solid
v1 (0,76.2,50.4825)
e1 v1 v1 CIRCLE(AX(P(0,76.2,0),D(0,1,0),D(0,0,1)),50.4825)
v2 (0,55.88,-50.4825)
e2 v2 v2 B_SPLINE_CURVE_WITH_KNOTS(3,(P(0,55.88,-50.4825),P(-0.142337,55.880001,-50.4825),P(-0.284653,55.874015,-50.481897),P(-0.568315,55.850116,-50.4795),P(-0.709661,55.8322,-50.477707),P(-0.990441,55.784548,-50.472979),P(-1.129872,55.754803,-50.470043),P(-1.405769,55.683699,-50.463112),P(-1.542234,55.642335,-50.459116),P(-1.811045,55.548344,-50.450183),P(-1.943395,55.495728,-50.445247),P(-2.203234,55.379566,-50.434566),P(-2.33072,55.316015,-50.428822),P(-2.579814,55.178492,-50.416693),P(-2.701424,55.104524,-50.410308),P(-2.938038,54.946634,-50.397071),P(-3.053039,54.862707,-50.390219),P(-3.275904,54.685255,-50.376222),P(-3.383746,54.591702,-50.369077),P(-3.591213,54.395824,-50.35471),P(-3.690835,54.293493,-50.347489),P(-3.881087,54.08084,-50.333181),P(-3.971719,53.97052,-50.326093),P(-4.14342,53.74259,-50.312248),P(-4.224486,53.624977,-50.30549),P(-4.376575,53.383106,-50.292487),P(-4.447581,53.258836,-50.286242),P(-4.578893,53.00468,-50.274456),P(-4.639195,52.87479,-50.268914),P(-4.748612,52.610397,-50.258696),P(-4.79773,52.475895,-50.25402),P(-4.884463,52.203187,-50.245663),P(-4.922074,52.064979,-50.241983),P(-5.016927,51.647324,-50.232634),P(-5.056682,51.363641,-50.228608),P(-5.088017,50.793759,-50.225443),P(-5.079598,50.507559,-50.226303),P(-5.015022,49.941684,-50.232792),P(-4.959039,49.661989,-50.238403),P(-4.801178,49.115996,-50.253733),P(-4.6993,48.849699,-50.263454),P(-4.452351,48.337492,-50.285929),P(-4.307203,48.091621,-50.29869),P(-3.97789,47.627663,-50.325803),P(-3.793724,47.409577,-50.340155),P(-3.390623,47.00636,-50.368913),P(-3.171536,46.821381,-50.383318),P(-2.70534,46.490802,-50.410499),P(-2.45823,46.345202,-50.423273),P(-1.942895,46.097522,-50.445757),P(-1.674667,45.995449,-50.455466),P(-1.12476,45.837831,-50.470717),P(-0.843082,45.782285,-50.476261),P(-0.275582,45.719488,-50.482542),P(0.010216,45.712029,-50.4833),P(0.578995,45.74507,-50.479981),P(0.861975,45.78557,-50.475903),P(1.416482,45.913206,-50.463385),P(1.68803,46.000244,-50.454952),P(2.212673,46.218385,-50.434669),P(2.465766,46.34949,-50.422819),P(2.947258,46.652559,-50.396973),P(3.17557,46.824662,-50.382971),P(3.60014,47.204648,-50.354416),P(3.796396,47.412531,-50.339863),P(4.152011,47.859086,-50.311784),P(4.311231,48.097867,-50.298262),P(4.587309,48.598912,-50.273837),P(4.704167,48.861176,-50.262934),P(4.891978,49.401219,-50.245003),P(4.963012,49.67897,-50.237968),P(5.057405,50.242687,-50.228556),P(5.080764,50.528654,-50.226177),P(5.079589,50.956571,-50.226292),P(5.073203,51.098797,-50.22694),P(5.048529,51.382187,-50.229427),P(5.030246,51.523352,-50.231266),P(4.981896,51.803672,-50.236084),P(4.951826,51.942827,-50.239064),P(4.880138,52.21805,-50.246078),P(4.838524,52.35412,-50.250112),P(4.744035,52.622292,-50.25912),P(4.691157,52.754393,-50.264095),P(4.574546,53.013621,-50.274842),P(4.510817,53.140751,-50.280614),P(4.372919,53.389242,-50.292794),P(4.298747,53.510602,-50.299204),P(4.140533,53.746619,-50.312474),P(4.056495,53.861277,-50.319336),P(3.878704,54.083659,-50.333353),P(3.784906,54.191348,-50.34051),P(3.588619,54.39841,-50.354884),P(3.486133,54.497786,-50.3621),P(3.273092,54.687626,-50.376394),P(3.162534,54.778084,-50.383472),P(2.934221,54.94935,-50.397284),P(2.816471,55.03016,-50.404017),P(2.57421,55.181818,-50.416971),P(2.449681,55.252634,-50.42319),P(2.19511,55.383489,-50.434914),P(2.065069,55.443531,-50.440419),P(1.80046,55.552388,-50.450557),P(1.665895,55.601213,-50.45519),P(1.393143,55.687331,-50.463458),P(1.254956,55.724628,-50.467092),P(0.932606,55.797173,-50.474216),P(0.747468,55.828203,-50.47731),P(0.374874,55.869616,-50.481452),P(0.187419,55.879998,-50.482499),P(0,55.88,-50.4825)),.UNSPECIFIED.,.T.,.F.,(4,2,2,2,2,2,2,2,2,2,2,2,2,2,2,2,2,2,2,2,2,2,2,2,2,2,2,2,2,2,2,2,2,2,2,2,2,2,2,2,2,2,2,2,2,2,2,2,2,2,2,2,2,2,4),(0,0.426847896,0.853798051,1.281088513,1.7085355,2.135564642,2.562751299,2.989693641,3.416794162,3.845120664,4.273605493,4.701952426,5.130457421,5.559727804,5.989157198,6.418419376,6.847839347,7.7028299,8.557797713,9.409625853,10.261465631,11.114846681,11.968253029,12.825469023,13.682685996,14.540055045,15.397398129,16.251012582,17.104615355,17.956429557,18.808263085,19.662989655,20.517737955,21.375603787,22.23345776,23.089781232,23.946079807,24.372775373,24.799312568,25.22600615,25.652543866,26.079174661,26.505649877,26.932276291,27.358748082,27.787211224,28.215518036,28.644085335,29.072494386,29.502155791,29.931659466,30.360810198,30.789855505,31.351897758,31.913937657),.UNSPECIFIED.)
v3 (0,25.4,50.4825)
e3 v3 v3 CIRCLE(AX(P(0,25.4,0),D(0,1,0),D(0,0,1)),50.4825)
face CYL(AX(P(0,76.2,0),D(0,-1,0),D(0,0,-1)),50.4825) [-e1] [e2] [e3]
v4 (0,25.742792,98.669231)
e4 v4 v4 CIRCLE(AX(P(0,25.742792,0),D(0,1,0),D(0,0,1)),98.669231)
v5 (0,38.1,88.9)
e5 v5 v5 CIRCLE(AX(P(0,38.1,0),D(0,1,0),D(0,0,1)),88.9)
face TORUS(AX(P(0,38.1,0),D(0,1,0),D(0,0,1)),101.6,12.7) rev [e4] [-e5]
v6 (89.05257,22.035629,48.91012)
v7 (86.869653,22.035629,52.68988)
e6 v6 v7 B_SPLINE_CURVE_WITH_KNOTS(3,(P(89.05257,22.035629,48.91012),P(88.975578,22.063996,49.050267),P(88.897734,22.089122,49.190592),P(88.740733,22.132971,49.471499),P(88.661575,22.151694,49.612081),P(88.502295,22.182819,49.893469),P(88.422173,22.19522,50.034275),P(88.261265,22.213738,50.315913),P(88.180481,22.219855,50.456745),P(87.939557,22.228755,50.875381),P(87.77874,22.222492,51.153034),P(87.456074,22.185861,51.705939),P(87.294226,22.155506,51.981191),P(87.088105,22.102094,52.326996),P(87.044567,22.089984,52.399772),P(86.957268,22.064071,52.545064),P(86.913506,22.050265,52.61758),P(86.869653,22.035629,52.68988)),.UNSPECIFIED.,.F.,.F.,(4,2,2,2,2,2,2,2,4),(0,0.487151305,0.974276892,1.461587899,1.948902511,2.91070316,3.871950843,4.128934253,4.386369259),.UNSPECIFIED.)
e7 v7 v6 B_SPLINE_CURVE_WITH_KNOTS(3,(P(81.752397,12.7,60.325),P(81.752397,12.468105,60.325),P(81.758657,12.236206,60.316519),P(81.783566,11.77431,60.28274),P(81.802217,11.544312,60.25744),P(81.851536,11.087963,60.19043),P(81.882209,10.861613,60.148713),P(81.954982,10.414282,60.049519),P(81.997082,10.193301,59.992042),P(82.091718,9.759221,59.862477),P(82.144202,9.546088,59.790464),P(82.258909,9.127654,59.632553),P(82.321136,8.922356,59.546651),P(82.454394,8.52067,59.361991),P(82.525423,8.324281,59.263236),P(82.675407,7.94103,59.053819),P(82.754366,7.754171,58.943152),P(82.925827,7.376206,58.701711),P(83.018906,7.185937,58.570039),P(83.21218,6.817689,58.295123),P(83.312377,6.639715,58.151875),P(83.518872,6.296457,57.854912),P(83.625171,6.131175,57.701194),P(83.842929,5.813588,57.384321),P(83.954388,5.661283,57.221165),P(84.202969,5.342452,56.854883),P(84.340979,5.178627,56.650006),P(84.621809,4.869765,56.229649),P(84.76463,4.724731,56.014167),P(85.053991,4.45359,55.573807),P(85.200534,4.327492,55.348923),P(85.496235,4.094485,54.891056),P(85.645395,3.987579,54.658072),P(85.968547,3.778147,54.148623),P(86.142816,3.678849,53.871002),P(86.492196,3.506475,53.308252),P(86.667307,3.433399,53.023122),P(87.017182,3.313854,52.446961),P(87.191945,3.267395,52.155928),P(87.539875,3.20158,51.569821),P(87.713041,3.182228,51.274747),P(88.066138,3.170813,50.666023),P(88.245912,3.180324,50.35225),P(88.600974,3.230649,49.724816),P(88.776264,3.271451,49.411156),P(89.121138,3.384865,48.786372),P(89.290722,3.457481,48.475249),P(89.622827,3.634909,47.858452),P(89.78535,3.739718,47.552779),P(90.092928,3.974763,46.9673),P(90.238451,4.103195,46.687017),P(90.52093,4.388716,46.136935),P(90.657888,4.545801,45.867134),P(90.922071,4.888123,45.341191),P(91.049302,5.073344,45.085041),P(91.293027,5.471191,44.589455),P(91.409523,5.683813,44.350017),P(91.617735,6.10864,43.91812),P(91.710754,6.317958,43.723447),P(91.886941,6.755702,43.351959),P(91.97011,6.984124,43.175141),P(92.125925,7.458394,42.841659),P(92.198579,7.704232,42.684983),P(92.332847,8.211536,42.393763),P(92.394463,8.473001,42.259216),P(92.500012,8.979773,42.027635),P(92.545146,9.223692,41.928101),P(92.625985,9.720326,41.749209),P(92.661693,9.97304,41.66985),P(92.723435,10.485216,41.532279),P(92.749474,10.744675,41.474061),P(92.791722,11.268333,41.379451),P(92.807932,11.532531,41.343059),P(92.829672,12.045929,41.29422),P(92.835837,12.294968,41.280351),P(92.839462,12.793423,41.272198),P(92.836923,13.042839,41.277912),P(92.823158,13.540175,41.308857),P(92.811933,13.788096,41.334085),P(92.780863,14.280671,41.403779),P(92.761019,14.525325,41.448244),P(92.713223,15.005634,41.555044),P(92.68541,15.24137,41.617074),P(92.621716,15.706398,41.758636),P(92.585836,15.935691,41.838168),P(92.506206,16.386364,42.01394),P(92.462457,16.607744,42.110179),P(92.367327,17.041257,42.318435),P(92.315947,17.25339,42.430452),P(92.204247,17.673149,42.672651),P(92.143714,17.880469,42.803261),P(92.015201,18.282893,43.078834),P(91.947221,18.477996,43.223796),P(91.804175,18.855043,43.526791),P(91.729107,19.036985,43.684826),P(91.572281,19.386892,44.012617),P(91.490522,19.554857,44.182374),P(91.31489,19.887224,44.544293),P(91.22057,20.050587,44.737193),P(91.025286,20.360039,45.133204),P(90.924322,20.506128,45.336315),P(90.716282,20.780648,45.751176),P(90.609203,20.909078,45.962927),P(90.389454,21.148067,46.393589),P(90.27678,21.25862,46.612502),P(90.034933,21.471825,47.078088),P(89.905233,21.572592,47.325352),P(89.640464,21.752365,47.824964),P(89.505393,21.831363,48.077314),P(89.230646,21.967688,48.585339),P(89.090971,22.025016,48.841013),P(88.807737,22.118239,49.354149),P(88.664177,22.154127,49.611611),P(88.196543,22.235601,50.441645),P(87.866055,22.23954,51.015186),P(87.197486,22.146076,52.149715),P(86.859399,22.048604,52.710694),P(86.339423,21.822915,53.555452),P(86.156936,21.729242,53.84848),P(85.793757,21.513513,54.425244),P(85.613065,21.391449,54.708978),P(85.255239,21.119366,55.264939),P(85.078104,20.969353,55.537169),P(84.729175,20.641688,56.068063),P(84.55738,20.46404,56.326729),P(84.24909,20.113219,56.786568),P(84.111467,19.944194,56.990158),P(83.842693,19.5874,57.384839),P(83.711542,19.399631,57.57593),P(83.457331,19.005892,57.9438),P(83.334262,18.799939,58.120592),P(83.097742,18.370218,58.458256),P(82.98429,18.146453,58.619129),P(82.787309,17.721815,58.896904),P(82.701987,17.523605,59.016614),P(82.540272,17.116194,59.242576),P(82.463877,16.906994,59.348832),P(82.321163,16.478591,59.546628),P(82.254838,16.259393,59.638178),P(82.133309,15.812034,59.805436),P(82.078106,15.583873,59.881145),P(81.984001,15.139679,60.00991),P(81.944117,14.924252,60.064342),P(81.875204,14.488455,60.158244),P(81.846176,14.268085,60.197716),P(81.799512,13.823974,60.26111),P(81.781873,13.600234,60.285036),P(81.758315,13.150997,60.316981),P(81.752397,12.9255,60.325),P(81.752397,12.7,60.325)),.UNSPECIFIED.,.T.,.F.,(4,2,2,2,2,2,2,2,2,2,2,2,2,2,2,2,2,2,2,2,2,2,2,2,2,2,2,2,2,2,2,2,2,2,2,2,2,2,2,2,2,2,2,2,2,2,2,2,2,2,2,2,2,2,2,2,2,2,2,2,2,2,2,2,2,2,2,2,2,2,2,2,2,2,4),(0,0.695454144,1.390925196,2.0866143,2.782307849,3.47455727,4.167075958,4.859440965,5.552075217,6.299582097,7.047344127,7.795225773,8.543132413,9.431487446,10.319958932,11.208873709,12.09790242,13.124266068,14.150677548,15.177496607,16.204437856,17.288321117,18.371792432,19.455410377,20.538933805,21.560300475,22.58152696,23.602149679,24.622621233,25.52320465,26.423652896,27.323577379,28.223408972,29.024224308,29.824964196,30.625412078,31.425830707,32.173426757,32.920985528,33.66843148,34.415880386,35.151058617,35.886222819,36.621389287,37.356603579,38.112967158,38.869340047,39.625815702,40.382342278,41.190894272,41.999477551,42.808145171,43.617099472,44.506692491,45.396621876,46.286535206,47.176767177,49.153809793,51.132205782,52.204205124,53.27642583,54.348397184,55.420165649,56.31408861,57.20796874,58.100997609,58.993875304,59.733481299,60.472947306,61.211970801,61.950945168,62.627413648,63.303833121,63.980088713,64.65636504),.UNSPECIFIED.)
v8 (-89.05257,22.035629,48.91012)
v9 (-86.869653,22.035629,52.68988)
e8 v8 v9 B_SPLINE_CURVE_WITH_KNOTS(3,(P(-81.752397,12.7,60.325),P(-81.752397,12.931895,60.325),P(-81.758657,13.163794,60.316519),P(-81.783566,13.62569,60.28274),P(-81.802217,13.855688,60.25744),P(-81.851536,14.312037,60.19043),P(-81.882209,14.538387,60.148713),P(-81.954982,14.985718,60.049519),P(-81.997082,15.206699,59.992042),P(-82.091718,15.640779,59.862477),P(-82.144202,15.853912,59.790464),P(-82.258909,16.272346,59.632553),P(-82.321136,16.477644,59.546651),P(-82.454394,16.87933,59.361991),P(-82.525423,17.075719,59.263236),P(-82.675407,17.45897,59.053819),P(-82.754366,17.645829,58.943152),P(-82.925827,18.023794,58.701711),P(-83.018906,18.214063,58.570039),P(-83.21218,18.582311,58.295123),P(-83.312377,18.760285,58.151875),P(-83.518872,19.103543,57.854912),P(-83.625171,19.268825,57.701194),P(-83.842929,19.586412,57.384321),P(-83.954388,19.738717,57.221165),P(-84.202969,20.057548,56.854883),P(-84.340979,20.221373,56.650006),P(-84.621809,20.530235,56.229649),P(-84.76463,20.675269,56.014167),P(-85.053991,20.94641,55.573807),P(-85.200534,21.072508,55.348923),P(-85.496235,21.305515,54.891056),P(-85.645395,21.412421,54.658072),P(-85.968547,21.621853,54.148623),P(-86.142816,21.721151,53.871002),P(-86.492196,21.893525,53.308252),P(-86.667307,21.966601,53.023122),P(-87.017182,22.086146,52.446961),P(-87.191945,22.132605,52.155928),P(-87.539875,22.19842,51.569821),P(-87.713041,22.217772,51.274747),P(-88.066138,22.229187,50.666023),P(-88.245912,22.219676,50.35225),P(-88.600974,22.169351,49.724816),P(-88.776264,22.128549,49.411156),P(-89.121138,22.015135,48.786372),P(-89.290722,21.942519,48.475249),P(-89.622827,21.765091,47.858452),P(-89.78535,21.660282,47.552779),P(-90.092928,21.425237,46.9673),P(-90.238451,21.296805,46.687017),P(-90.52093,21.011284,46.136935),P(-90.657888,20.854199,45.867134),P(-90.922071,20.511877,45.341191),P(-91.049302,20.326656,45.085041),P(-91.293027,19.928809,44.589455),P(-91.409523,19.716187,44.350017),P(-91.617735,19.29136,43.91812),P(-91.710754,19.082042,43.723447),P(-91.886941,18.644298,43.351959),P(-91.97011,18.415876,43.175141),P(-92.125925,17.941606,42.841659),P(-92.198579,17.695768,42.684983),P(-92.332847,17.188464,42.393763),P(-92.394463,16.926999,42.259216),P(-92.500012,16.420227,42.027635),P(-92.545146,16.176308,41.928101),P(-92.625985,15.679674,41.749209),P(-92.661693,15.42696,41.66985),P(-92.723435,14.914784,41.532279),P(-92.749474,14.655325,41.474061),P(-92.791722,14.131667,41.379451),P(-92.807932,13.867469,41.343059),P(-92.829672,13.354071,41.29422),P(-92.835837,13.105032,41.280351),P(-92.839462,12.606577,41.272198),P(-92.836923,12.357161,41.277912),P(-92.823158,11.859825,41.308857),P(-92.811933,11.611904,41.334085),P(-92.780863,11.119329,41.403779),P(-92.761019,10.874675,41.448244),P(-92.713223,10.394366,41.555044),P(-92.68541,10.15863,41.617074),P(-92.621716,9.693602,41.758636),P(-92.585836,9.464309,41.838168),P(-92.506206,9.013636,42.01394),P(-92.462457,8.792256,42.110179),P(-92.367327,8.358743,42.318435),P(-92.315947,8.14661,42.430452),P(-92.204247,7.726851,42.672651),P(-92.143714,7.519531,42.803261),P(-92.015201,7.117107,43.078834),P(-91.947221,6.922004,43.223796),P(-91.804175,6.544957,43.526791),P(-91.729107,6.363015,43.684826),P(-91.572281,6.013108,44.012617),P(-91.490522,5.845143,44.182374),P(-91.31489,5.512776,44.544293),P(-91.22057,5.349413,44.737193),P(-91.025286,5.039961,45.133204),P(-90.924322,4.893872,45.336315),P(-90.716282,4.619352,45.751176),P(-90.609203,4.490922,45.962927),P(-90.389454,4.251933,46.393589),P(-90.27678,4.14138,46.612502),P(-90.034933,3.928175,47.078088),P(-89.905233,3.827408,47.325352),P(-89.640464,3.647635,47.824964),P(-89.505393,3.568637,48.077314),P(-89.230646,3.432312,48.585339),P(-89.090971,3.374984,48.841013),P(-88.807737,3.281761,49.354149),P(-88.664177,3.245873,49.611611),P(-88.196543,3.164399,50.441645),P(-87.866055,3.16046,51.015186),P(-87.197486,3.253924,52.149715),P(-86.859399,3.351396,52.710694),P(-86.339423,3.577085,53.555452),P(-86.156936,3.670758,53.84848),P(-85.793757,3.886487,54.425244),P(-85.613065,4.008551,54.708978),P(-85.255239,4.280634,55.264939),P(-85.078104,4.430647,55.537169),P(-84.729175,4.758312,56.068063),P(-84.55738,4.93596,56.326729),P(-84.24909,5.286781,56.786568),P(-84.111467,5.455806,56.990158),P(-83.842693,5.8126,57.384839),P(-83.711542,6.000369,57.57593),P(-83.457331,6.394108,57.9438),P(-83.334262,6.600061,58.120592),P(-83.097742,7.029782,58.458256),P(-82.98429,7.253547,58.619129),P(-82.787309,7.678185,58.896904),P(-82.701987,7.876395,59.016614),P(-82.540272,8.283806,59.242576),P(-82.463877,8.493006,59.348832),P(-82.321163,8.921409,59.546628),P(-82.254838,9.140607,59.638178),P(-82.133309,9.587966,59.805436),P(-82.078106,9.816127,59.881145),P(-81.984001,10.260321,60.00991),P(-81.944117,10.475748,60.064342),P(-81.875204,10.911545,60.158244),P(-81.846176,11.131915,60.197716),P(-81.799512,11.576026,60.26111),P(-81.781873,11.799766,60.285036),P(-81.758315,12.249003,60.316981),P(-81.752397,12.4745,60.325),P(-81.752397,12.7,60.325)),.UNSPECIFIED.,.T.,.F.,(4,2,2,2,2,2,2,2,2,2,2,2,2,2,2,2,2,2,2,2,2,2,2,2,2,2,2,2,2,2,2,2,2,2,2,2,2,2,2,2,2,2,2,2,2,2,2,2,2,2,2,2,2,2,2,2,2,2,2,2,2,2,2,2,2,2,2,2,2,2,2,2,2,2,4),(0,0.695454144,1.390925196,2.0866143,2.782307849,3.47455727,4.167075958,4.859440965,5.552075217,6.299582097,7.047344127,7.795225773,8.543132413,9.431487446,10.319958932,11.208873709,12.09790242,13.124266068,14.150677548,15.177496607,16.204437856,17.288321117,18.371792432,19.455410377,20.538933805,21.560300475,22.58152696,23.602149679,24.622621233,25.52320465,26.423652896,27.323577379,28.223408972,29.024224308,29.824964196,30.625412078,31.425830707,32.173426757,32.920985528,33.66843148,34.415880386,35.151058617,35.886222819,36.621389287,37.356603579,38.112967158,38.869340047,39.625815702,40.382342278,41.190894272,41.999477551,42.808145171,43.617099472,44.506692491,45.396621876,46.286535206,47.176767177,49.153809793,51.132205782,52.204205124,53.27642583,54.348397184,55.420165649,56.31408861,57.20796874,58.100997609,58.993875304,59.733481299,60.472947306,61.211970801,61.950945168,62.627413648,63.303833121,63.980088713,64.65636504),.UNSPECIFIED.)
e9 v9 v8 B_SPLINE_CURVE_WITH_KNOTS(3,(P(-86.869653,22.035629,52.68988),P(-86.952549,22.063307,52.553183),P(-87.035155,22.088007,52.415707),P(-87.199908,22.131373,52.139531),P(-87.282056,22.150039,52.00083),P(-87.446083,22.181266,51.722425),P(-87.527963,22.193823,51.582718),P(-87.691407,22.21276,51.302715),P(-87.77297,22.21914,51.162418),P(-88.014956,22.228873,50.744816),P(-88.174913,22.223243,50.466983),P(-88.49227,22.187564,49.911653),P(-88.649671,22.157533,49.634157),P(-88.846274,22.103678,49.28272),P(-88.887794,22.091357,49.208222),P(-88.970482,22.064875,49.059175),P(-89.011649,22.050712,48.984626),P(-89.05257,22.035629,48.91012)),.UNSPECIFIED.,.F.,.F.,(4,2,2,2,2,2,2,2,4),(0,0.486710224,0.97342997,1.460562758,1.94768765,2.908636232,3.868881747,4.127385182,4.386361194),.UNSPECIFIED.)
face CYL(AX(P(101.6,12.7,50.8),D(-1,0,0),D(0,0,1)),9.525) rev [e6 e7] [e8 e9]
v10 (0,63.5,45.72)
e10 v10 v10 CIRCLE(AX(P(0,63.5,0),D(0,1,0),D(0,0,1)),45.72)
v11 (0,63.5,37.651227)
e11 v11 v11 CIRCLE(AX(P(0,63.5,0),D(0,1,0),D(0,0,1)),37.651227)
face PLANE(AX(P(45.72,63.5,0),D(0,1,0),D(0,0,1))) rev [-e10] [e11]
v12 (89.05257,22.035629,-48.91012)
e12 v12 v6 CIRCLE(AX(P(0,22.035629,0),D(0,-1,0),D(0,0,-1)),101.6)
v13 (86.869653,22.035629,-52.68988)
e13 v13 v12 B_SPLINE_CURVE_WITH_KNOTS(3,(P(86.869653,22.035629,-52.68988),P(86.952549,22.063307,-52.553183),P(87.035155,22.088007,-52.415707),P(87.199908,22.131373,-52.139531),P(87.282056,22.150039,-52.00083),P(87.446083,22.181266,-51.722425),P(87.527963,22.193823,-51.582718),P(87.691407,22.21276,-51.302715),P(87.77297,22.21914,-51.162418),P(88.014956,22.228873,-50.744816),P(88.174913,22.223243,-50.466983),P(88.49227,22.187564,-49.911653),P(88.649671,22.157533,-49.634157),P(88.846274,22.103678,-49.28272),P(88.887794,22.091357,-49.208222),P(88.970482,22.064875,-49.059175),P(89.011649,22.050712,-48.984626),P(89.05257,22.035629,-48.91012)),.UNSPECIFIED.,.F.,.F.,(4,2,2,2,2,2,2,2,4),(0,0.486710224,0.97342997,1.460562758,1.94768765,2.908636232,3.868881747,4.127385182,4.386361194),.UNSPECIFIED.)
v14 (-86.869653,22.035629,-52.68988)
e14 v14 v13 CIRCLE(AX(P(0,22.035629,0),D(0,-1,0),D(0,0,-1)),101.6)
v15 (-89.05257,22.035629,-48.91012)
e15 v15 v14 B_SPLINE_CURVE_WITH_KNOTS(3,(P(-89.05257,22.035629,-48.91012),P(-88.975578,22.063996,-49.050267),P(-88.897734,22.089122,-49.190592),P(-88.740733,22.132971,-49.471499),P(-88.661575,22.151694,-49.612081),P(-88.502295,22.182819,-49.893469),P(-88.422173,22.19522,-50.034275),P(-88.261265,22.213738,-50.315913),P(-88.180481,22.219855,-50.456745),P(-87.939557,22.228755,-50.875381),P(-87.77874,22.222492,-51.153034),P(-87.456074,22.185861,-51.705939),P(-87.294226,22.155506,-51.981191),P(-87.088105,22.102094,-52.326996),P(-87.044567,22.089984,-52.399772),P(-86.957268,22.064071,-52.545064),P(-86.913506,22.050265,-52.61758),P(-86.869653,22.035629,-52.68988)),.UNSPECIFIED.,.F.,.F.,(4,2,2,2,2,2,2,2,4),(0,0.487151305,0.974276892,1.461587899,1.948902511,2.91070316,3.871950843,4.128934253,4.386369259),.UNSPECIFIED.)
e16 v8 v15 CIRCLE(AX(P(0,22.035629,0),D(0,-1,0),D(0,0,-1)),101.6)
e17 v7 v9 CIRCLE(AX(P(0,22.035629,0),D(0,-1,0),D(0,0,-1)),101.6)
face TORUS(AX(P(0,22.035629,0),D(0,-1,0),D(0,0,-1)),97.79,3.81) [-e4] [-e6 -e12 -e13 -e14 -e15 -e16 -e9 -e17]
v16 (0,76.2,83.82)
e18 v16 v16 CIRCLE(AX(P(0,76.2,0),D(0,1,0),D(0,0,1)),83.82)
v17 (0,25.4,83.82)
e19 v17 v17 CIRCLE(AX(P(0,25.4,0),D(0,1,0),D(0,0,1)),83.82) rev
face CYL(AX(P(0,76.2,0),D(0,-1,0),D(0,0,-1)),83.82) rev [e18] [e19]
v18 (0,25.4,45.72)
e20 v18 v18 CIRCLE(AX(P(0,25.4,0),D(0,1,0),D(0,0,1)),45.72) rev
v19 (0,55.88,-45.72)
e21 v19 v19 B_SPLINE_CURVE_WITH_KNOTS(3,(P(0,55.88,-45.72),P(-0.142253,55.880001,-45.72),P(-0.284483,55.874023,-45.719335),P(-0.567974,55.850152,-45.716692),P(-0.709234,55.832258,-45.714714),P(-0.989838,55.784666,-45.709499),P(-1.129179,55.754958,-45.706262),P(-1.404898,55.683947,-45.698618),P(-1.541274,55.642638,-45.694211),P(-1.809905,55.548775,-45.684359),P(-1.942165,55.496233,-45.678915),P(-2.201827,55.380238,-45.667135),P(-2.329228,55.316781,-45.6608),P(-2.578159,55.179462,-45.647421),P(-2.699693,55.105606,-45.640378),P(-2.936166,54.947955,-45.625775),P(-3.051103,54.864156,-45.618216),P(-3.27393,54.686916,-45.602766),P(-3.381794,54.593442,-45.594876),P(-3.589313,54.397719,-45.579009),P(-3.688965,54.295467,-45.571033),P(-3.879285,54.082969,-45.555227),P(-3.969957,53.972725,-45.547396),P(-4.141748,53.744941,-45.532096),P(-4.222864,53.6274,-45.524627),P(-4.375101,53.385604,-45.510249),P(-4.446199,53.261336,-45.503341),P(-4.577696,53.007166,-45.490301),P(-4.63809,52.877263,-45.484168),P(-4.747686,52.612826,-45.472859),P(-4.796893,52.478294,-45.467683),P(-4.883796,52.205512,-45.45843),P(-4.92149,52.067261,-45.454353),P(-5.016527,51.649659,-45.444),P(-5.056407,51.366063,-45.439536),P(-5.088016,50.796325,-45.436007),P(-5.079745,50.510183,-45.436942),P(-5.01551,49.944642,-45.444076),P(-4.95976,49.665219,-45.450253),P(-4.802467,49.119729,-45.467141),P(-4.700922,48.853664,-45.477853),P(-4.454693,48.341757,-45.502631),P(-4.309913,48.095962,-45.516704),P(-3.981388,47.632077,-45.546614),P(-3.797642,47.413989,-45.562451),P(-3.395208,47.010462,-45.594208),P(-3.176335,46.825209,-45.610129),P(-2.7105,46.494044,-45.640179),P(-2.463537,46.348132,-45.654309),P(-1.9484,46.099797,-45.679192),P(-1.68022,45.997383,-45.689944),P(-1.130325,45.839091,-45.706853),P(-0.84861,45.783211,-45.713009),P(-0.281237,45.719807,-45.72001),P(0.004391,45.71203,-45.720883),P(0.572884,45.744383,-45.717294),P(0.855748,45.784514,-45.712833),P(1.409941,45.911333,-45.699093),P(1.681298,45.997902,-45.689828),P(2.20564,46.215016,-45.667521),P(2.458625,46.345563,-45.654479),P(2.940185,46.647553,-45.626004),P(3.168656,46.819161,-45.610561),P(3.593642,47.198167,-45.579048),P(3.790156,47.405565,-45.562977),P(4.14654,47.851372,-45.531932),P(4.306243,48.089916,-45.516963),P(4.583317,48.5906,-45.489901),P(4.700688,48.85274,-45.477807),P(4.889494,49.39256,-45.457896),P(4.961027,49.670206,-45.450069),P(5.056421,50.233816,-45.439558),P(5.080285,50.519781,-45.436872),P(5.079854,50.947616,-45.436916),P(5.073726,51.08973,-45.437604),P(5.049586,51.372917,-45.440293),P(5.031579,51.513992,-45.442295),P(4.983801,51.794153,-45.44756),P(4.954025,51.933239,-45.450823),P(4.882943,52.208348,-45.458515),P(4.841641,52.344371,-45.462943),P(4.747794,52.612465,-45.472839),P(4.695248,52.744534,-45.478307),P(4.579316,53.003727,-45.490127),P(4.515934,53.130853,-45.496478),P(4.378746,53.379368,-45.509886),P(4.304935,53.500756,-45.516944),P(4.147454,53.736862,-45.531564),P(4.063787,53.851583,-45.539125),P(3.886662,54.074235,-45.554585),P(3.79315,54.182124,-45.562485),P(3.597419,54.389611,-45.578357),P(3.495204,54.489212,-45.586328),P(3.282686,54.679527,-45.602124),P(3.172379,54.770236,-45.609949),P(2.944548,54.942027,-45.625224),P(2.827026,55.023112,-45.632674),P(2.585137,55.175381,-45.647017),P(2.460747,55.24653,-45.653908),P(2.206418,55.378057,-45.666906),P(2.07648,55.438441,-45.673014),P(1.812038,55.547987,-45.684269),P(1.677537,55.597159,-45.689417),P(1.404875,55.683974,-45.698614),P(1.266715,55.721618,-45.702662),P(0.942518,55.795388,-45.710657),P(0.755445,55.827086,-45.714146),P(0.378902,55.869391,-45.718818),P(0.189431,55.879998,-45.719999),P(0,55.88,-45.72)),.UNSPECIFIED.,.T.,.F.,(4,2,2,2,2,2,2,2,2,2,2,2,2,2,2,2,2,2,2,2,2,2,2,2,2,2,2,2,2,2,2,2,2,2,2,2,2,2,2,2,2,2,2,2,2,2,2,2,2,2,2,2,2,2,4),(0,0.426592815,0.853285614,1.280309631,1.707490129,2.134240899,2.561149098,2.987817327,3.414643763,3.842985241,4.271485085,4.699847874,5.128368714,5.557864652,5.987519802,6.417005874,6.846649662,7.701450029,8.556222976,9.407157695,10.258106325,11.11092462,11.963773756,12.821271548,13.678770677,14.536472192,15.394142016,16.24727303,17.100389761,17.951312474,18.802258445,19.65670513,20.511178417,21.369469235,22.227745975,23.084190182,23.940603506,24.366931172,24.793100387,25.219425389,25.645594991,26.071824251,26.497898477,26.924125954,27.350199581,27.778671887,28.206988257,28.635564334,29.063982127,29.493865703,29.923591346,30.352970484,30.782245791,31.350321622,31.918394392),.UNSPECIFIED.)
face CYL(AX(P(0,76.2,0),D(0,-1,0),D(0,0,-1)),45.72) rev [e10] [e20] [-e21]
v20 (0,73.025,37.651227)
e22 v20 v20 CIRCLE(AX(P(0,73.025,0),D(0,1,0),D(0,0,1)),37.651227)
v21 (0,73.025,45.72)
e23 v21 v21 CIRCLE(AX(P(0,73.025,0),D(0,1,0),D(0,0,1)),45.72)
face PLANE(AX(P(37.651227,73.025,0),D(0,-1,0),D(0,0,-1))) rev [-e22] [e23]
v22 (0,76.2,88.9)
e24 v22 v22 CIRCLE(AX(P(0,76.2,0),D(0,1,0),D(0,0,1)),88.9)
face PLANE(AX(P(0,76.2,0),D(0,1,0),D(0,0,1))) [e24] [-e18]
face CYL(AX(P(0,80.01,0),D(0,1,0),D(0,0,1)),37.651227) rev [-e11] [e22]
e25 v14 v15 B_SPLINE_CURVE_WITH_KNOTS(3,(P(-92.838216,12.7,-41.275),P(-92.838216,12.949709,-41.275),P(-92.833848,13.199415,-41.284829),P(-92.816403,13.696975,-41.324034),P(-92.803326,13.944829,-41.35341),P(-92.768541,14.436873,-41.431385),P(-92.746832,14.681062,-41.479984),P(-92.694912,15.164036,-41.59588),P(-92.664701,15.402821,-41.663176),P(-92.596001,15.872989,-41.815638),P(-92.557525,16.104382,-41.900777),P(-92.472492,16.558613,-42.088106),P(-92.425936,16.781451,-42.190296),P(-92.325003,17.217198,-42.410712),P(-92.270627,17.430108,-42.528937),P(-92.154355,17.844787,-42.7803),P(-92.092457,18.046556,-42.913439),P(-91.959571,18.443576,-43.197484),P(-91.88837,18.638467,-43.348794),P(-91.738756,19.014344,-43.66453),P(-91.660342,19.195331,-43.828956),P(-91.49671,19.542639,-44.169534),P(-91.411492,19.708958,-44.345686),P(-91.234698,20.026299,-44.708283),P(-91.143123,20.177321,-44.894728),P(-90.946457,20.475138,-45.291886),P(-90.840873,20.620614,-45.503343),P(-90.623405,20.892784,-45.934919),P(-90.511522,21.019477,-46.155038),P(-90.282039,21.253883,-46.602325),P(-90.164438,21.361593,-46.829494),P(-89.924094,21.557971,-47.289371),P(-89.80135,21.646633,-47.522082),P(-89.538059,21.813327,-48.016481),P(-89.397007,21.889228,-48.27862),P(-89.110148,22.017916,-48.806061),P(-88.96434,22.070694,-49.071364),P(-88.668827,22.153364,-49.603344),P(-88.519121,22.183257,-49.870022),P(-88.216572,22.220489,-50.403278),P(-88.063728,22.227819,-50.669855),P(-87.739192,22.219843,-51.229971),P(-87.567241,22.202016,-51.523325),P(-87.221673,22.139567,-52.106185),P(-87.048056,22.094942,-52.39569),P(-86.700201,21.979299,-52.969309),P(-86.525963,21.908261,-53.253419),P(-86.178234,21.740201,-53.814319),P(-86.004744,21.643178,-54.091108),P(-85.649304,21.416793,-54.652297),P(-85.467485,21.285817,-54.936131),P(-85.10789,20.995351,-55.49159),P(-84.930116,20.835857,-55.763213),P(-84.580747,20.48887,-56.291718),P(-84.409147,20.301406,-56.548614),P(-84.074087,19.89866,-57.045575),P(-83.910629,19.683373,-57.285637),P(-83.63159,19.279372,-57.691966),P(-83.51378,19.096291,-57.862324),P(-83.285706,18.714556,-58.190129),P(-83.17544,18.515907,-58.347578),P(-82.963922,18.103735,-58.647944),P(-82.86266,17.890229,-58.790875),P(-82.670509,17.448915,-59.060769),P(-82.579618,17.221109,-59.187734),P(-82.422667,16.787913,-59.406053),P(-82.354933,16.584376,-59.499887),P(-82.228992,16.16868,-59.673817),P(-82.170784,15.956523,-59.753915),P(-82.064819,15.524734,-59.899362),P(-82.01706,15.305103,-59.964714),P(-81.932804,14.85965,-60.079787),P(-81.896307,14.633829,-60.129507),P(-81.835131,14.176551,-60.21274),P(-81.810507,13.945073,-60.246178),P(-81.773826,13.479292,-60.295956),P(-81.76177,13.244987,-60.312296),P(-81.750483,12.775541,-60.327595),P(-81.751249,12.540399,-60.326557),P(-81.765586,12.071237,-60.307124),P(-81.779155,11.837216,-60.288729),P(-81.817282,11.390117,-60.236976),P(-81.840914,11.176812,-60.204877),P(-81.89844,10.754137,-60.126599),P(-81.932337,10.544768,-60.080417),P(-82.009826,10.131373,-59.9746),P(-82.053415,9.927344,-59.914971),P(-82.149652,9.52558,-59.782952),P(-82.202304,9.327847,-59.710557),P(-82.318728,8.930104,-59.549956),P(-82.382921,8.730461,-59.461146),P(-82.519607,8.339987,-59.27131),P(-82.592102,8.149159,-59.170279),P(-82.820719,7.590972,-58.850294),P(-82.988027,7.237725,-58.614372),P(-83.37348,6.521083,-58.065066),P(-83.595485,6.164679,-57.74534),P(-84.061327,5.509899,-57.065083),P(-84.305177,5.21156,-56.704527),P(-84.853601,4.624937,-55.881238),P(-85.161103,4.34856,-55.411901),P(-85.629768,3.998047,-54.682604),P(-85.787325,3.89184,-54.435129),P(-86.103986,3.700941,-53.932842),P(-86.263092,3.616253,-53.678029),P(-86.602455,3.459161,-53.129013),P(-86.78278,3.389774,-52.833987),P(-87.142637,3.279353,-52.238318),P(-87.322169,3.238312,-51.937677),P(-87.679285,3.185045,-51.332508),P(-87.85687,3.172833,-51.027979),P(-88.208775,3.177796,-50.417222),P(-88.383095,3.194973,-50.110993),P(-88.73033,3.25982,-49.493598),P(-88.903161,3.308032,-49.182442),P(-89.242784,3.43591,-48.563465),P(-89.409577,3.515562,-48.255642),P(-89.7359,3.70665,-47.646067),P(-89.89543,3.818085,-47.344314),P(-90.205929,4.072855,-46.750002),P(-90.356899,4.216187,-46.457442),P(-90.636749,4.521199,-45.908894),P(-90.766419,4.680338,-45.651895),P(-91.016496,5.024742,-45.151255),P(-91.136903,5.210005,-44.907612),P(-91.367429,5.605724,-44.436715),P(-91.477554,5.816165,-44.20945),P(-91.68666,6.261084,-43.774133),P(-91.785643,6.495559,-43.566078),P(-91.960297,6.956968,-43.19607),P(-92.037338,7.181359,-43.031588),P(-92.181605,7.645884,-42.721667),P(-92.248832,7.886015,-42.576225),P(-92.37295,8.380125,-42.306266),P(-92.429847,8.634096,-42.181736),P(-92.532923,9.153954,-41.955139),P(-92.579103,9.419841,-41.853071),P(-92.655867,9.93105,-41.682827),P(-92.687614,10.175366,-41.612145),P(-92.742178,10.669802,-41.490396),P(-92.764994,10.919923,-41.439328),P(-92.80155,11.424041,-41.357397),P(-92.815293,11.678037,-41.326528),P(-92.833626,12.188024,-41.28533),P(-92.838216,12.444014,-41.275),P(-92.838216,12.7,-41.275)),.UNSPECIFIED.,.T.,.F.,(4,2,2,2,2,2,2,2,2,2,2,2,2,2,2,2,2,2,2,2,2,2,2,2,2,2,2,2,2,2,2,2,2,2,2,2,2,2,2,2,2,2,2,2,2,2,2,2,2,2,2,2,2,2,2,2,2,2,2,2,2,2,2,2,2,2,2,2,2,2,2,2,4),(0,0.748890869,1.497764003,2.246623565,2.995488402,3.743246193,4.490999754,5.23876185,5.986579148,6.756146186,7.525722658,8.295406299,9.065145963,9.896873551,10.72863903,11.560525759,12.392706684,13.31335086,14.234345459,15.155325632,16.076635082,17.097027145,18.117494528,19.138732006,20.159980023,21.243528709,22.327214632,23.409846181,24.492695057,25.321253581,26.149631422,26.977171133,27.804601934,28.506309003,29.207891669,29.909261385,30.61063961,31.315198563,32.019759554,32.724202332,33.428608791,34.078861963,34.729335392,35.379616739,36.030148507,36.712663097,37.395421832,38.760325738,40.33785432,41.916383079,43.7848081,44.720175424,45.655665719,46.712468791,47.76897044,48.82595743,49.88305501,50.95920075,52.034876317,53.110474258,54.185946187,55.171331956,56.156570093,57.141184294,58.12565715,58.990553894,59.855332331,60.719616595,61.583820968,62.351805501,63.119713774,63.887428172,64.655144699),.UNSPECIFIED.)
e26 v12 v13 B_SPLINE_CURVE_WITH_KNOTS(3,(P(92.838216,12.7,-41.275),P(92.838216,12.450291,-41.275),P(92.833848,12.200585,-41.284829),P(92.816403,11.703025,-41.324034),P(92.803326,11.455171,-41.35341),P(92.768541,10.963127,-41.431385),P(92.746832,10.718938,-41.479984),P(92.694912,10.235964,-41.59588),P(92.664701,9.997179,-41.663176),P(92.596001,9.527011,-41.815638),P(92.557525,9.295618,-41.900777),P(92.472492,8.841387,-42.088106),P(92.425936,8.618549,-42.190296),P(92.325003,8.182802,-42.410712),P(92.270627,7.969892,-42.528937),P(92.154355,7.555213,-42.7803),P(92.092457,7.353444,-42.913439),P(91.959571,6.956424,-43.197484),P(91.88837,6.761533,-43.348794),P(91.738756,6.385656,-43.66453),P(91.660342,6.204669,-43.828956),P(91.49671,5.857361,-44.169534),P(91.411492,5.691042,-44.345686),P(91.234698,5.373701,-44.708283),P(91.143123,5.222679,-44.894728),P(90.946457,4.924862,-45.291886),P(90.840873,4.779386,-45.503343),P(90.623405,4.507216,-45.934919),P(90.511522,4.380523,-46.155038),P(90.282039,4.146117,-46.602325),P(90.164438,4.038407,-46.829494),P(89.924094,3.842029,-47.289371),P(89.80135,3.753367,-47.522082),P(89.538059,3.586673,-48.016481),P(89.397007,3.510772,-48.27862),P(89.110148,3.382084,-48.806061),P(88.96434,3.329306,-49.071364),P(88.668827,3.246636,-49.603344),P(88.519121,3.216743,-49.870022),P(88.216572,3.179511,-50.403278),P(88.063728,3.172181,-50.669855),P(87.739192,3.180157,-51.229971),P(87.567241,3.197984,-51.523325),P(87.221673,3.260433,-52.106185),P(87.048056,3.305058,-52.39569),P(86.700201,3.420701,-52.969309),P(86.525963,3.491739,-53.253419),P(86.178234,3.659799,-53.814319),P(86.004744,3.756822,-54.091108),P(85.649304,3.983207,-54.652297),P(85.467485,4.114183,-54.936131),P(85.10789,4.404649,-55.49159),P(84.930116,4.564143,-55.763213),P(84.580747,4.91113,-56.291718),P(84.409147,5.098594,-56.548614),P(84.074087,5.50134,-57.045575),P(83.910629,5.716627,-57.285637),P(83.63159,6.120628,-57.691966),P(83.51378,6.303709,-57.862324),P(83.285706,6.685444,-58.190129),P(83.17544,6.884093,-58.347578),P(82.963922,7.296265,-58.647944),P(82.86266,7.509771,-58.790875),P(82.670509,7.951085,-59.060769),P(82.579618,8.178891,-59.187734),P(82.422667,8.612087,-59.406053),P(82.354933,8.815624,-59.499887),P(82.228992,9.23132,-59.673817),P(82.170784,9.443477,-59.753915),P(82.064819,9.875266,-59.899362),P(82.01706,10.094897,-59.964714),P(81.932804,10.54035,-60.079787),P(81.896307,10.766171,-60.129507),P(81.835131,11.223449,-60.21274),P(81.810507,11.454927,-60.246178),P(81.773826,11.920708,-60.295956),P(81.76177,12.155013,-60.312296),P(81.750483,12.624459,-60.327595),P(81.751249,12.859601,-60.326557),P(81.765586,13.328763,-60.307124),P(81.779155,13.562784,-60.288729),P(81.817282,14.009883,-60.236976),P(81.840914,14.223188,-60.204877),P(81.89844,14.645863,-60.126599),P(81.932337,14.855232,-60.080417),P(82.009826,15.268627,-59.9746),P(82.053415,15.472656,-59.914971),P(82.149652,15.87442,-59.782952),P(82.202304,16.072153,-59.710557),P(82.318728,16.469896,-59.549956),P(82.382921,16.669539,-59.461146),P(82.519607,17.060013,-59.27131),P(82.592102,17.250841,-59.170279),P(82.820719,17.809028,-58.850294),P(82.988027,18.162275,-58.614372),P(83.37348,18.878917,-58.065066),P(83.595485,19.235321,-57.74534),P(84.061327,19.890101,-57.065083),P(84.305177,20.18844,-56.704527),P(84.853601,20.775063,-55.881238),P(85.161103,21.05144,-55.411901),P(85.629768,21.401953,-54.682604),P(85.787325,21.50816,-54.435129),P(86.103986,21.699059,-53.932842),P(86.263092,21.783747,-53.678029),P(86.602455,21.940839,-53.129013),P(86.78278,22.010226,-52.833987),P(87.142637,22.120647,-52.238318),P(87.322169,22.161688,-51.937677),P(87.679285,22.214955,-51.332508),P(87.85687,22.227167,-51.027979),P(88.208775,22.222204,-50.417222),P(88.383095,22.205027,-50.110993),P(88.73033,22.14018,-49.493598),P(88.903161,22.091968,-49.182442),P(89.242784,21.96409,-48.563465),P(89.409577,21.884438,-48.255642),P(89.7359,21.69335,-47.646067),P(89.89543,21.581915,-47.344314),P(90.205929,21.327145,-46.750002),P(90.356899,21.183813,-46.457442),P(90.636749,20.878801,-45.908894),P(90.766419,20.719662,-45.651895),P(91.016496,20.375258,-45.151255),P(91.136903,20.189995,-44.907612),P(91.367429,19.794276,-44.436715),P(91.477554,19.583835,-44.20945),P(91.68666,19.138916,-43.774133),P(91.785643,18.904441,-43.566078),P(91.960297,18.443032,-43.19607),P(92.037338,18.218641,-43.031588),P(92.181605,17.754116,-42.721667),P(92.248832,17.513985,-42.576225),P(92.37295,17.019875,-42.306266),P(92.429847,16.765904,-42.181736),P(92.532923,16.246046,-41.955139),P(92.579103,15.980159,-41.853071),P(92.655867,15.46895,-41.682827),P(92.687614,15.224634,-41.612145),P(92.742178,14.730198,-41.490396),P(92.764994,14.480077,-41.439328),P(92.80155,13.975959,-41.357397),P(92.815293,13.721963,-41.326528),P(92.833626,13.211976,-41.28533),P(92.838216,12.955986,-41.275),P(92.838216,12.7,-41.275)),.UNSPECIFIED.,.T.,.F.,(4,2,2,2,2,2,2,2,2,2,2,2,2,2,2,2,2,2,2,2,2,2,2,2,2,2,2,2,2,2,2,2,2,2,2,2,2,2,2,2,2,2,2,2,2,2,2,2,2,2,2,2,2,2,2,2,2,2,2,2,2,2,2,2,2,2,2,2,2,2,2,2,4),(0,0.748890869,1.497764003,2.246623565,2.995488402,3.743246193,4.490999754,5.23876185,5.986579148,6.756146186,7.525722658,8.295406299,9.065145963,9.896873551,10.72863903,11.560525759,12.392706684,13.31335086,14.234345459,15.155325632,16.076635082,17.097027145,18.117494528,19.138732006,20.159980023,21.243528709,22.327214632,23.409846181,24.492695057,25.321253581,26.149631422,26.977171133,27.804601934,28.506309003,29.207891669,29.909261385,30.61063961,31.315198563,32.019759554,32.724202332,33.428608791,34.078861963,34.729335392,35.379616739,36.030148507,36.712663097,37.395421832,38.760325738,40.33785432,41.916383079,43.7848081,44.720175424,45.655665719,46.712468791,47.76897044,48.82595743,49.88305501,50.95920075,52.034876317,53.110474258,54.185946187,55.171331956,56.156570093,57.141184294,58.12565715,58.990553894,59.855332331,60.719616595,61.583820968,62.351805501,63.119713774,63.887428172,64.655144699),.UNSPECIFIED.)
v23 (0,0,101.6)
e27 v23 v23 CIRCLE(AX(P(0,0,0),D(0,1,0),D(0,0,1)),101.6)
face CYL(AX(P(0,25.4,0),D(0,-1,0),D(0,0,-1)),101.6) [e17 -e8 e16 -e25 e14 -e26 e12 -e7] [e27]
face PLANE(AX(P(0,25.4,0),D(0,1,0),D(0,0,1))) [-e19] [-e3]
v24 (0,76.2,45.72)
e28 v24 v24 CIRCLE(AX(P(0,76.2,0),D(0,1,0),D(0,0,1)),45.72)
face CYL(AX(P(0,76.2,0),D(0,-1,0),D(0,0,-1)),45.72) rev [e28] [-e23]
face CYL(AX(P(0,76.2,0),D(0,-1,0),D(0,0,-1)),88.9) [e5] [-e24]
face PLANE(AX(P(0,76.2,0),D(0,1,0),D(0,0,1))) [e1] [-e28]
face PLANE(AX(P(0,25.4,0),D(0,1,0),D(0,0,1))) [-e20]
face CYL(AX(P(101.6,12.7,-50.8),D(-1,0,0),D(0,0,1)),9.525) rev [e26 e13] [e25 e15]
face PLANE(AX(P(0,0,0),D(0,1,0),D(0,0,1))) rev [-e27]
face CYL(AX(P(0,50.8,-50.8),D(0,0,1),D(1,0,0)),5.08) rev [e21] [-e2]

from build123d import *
from build123d.topology import SkipClean

# Parameters (mm, degrees)
SKETCH1_R               = 101.6
BOSS_EXTRUDE1_DEPTH     = 25.4
SKETCH4_R               = 88.9
SKETCH4_R_2             = 83.82
BOSS_EXTRUDE2_DEPTH     = 50.8
CUT_EXTRUDE4_DEPTH      = 101.6
CUT_EXTRUDE4_DEPTH_BACK = 101.6
SKETCH2_R               = 9.525
FILLET7_R               = 12.7
FILLET8_R               = 3.81
SKETCH11_R              = 50.4825
SKETCH11_R_2            = 45.72
BOSS_EXTRUDE5_DEPTH     = 50.8
SKETCH13_W              = 8.068772826
SKETCH13_H              = 9.525
SKETCH14_R              = 5.08
CUT_EXTRUDE5_DEPTH      = 50.8


# Some blends are built 0.0001 mm under size
with BuildPart() as part:
    # Sketch1 → Boss-Extrude1 (new body)
    with BuildSketch(Plane(origin=(0, 0, 0), x_dir=(1, 0, 0), z_dir=(0, 1, 0))):
        with Locations(Location((0, 0, 0), (0, 0, 270))):
            Circle(SKETCH1_R)
    extrude(amount=BOSS_EXTRUDE1_DEPTH)

    # Sketch4 → Boss-Extrude2 (add)
    with BuildSketch(Plane(origin=(0, 25.4, 0), x_dir=(1, 0, 0), z_dir=(0, 1, 0))):
        with Locations(Location((0, 0, 0), (0, 0, 270))):
            Circle(SKETCH4_R)
        with Locations(Location((0, 0, 0), (0, 0, 270))):
            Circle(SKETCH4_R_2, mode=Mode.SUBTRACT)
    extrude(amount=BOSS_EXTRUDE2_DEPTH)

    # Sketch2 → Cut-Extrude4 (cut, two sides: drawn at the far end of the back side and taken through both)
    with BuildSketch(Plane(origin=(0, 0, 0), x_dir=(0, 0, -1), z_dir=(1, 0, 0)).offset(-CUT_EXTRUDE4_DEPTH_BACK)):
        with Locations(Location((50.8, 12.7, 0), (0, 0, 180))):
            Circle(SKETCH2_R)
        with Locations(Location((-50.8, 12.7, 0), (0, 0, 180))):
            Circle(SKETCH2_R)
    extrude(amount=CUT_EXTRUDE4_DEPTH + CUT_EXTRUDE4_DEPTH_BACK, mode=Mode.SUBTRACT)

    # Fillet7
    fillet7_edges = [part.edges().sort_by_distance(p)[0] for p in [
        (0, 25.4, -88.9),
    ]]
    fillet(fillet7_edges, radius=FILLET7_R - 0.0001)  # a hair under: the kernel refuses the full size

    # Fillet8
    # the kernel refuses this fillet: 3.81 mm, written as the material it takes off along each edge
    with BuildSketch(Plane(origin=(0, 25.4, 0), x_dir=(0, 0, 1), z_dir=(-1, 0, 0))) as fillet8_piece_1:
        with BuildLine():
            CenterArc((97.79, -3.364391457), FILLET8_R, 360, 76.657910561)
            Line((101.6, -3.364391457), (101.981, -3.364391457))
            Line((101.981, -3.364391457), (101.981, 0))
            Line((101.981, 0), (101.6, 0.381))
            ThreePointArc((101.6, 0.381), (101.5999, 0.381), (98.757134319, 0.713491843))
            Line((98.757134319, 0.713491843), (98.669213018, 0.34277518))
        make_face()
    revolve(axis=Axis((0, 25.4, 0), (0, 1, 0)), mode=Mode.SUBTRACT)

    # Sketch11 → Boss-Extrude5 (add)
    with SkipClean():  # the faces are left unmerged after this step: merging them gives an invalid solid
        with BuildSketch(Plane(origin=(0, 25.4, 0), x_dir=(1, 0, 0), z_dir=(0, 1, 0))):
            with Locations(Location((0, 0, 0), (0, 0, 270))):
                Circle(SKETCH11_R)
            with Locations(Location((0, 0, 0), (0, 0, 270))):
                Circle(SKETCH11_R_2, mode=Mode.SUBTRACT)
        extrude(amount=BOSS_EXTRUDE5_DEPTH)

    # Sketch13 → Revolve1 (revolve)
    with SkipClean():  # the faces are left unmerged after this step: merging them gives an invalid solid
        with BuildSketch(Plane.XY, mode=Mode.PRIVATE) as revolve1_sk:
            with Locations((41.685613587, 68.2625)):
                Rectangle(SKETCH13_W, SKETCH13_H)
        revolve(revolve1_sk.sketch.rotate(Axis((0, 80.01, 0), (0, -1, 0)), 90), axis=Axis((0, 80.01, 0), (0, -1, 0)))

    # Sketch14 → Cut-Extrude5 (cut)
    with SkipClean():  # the faces are left unmerged after this step: merging them gives an invalid solid
        with BuildSketch(Plane.XY):
            with Locations(Location((0, 50.8, 0), (0, 0, 90))):
                Circle(SKETCH14_R)
        extrude(amount=-CUT_EXTRUDE5_DEPTH, mode=Mode.SUBTRACT)


solid = part.part
